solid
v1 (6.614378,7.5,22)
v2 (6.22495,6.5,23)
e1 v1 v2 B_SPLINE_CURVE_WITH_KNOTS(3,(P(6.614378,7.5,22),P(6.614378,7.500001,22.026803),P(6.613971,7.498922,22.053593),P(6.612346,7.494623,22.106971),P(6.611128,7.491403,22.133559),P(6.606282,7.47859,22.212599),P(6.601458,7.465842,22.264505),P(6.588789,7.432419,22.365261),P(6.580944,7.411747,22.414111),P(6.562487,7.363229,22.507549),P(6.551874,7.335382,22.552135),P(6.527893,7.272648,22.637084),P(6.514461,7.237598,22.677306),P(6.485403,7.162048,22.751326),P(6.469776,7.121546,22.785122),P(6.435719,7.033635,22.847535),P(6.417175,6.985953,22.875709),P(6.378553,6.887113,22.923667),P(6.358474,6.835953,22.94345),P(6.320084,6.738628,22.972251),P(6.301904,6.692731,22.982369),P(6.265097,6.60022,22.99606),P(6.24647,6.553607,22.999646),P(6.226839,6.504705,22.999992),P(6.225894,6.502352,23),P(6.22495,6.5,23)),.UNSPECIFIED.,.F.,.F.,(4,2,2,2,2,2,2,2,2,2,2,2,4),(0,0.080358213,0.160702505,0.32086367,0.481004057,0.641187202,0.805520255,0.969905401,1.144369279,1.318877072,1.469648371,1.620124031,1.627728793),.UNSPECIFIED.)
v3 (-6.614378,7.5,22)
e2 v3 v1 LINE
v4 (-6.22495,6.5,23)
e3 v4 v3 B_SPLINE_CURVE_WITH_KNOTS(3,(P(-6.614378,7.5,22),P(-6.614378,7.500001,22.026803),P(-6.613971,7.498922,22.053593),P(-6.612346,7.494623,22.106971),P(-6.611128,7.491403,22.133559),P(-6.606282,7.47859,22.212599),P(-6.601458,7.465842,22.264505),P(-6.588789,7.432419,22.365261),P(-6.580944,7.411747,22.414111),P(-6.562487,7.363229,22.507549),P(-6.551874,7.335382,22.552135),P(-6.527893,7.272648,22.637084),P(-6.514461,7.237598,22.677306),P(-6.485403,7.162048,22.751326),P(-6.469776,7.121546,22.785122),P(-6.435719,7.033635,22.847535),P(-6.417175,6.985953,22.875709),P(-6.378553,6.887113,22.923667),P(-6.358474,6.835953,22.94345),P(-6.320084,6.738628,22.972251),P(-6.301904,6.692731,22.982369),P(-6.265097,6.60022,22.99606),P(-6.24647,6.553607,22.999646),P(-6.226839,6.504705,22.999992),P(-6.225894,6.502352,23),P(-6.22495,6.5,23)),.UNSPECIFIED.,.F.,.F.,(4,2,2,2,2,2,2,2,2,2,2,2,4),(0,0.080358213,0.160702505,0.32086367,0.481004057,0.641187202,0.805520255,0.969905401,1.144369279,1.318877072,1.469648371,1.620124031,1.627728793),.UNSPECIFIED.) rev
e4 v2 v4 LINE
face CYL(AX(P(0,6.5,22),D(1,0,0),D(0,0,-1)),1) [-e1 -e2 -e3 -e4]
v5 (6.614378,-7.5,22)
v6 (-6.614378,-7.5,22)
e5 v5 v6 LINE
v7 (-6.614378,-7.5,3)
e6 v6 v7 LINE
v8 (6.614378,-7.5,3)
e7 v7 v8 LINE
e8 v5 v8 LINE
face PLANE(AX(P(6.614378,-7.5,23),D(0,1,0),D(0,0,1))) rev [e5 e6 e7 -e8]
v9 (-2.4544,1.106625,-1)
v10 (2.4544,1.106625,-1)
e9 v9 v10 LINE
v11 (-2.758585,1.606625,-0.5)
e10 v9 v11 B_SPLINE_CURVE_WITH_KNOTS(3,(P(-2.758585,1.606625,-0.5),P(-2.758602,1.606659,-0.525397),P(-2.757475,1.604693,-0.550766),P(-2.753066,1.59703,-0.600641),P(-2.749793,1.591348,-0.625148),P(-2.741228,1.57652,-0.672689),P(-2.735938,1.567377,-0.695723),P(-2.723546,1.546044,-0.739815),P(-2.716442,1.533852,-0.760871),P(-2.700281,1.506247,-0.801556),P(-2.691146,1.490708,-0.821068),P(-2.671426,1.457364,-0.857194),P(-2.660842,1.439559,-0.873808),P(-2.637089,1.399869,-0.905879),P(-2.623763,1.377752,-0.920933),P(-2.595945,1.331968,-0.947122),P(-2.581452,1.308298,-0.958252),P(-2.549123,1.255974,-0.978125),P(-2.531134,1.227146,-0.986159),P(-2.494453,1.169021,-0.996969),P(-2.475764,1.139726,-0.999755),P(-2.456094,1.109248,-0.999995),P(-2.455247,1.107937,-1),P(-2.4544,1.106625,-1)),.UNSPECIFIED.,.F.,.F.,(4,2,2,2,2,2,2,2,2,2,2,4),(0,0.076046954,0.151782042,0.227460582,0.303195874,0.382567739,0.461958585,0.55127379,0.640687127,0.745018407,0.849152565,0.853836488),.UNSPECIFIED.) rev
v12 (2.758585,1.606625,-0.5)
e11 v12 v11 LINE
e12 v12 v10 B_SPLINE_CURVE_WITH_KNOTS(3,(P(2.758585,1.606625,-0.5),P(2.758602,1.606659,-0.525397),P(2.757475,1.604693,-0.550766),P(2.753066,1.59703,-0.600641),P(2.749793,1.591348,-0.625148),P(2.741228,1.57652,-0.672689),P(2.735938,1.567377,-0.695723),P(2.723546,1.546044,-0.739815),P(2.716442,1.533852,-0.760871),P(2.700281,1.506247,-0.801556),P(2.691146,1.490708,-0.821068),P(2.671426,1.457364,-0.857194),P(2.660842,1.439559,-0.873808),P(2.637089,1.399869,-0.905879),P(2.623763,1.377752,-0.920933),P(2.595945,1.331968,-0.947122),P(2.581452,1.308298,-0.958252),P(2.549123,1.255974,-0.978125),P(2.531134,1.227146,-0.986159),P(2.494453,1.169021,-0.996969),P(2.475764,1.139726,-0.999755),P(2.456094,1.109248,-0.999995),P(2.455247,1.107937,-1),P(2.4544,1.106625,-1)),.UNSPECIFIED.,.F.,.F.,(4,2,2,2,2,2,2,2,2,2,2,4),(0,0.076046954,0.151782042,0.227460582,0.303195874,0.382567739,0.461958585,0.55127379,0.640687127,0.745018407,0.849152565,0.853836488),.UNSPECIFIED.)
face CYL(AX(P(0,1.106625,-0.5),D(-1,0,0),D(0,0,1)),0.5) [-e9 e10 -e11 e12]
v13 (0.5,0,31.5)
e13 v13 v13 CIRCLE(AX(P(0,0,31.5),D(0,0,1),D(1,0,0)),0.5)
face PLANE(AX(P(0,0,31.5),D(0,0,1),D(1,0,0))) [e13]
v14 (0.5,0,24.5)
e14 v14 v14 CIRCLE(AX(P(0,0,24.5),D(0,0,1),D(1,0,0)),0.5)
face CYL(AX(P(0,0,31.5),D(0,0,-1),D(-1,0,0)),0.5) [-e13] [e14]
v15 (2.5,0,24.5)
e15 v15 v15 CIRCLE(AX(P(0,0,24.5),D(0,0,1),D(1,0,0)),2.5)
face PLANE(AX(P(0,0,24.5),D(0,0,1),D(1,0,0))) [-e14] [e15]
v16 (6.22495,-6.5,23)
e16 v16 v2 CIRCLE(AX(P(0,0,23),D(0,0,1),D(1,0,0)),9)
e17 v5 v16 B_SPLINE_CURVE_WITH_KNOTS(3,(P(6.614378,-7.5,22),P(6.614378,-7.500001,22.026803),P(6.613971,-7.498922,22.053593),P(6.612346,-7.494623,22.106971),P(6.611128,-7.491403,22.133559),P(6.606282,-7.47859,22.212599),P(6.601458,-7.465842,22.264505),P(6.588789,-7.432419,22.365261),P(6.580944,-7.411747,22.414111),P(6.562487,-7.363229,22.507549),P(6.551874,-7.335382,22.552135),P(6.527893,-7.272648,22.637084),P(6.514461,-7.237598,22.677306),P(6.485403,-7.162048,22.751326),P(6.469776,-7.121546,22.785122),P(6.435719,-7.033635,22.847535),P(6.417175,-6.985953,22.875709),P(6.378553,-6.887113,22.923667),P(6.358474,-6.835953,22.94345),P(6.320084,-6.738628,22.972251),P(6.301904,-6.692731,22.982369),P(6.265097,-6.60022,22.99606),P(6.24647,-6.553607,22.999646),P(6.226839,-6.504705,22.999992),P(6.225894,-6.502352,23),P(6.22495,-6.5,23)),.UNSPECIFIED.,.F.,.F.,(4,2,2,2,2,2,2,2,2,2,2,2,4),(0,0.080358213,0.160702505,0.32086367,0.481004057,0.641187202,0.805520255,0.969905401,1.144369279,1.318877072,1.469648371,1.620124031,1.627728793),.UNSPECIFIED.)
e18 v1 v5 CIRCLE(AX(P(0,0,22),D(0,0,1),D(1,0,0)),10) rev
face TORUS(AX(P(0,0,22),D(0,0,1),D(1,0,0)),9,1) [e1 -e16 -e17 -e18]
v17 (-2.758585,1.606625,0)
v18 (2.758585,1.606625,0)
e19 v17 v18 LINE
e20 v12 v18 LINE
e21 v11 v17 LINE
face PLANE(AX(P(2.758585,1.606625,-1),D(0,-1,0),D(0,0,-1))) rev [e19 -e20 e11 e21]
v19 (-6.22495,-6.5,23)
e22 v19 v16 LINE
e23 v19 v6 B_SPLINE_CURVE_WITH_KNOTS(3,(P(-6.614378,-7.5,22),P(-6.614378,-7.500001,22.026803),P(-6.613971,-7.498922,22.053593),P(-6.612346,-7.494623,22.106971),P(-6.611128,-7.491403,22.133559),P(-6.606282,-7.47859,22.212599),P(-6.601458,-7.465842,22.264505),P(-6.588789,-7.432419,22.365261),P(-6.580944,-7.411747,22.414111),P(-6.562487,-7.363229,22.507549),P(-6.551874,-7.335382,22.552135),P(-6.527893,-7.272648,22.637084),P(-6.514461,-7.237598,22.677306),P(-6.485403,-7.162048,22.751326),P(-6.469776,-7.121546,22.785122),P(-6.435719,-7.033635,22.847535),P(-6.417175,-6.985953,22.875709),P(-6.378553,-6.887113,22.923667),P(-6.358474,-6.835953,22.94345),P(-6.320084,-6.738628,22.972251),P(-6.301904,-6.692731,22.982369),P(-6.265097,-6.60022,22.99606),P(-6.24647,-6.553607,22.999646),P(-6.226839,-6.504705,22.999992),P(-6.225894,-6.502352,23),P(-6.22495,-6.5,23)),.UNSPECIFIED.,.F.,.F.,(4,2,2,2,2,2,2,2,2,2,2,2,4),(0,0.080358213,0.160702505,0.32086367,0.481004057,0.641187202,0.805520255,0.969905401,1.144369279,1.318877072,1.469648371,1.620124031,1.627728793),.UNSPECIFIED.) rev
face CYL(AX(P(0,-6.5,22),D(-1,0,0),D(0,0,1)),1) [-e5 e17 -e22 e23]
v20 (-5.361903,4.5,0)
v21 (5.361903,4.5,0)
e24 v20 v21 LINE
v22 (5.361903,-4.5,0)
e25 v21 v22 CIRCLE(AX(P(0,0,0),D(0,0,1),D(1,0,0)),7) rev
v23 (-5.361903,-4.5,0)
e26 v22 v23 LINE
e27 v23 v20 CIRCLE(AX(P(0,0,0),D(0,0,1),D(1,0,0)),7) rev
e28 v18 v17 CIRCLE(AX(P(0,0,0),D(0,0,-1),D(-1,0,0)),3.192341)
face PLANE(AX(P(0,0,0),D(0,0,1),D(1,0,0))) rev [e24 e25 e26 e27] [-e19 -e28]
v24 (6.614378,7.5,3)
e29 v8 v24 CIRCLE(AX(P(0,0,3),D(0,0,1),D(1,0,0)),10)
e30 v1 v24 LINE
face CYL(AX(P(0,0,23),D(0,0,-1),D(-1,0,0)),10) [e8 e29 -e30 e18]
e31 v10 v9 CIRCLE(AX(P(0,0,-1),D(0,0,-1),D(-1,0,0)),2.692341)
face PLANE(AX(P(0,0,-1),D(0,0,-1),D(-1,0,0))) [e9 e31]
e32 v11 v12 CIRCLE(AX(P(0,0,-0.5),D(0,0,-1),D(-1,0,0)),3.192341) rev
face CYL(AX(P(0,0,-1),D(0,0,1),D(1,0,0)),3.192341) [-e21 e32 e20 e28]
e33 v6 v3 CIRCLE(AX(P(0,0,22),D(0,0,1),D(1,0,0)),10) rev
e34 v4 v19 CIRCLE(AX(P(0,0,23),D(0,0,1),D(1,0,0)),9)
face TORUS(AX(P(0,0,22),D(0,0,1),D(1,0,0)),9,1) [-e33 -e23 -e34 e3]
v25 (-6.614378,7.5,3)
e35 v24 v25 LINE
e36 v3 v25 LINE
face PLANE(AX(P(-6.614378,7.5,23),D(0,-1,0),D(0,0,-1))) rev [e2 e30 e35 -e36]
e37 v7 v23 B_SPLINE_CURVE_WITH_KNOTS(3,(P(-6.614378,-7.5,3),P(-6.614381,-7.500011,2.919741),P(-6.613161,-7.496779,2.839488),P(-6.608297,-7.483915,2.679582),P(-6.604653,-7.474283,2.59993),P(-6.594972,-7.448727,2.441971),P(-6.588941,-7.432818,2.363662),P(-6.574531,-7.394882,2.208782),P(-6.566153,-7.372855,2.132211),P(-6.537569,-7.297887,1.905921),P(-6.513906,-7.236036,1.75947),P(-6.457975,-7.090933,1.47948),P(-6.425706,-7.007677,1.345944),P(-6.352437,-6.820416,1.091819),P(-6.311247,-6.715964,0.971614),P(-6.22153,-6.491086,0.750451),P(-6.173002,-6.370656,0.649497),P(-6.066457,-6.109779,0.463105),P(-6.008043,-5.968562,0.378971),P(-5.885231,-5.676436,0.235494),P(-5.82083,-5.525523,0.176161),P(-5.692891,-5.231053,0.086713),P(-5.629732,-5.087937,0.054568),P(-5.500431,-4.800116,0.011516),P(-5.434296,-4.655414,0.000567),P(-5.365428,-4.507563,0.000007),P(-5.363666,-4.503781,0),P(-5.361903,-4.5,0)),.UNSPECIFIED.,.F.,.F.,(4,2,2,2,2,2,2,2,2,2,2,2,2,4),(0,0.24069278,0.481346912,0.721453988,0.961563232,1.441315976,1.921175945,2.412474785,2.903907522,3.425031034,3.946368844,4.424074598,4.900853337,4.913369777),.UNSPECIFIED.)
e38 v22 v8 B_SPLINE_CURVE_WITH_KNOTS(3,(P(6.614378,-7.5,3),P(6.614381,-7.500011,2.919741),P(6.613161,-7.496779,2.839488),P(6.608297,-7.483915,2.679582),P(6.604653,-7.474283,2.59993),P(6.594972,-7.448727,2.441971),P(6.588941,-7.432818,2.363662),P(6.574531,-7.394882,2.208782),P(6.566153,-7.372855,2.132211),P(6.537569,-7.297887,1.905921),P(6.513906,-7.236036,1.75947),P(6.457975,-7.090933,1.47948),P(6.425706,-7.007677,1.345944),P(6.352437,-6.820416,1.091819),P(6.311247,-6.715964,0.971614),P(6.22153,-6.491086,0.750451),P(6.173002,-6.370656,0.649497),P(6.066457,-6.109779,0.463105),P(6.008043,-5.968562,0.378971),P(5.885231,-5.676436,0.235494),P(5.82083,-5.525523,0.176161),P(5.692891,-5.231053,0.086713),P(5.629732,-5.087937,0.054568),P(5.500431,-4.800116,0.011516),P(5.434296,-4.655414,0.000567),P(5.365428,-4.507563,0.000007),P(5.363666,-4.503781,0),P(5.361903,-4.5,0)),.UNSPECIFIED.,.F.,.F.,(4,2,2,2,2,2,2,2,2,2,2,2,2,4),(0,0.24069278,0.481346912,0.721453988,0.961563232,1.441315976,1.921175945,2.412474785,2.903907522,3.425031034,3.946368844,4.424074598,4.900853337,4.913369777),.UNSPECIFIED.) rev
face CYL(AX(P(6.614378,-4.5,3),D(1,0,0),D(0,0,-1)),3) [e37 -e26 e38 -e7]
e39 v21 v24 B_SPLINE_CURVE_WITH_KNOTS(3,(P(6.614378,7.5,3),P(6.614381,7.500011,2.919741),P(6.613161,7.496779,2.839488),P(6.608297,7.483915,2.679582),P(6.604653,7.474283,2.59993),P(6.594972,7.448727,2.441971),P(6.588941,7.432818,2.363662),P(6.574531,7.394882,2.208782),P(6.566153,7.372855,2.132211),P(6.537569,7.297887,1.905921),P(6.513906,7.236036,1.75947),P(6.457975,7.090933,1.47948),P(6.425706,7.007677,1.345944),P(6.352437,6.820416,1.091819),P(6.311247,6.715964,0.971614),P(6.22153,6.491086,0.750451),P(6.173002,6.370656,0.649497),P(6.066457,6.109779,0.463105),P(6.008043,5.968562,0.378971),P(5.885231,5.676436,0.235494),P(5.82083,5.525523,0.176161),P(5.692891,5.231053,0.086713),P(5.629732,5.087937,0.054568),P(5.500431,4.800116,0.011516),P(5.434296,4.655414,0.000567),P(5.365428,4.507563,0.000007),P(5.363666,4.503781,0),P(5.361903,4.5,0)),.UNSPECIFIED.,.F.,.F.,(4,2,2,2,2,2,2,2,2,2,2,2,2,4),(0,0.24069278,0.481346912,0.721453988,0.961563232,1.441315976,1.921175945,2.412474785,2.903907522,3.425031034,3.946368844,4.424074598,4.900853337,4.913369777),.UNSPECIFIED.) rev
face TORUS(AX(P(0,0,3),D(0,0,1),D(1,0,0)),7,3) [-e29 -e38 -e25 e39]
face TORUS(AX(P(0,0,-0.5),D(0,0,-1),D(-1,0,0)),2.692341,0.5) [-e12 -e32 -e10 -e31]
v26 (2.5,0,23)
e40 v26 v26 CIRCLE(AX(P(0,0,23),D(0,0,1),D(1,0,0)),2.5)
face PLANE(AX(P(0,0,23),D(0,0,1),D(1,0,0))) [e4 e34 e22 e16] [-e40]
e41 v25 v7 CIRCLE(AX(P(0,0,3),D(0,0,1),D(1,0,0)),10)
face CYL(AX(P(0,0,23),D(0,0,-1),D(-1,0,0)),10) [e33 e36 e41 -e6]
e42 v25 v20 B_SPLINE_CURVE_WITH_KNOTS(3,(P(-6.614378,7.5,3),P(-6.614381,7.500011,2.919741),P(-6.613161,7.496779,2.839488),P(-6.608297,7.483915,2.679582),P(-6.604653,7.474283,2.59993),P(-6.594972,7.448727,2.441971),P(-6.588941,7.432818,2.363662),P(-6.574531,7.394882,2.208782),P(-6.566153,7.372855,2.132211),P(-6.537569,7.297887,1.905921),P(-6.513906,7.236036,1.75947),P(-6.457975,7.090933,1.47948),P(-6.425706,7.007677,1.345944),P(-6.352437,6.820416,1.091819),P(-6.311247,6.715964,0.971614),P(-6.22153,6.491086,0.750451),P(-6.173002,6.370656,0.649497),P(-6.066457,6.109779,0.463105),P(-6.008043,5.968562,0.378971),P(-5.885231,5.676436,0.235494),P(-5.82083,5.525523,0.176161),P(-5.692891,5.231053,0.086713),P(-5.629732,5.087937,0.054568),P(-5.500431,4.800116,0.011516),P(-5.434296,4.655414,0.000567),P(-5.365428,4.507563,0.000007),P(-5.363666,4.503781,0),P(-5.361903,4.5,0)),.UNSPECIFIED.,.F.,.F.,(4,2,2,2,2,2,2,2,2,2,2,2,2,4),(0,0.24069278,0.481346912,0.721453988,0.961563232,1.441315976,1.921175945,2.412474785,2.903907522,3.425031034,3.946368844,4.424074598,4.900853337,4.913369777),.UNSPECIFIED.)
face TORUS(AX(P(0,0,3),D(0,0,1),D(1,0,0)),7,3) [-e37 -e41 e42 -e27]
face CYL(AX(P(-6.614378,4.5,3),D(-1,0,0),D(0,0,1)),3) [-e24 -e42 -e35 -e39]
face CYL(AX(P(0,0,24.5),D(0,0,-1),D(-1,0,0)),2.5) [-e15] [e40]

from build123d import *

# Parameters (mm, degrees)
BOSS_EXTRUDE1_DEPTH = 23
SKETCH2_R           = 2.5
BOSS_EXTRUDE2_DEPTH = 1.5
SKETCH3_R           = 0.5
BOSS_EXTRUDE3_DEPTH = 7
FILLET1_R           = 1
FILLET2_R           = 3
BOSS_EXTRUDE4_DEPTH = 1
FILLET3_R           = 0.5


with BuildPart() as part:
    # Sketch1 → Boss-Extrude1 (new body)
    with BuildSketch(Plane.XY):
        with BuildLine():
            Line((-6.614378278, 7.5), (6.614378278, 7.5))
            ThreePointArc((6.614378278, 7.5), (10, 0), (6.614378278, -7.5))
            Line((6.614378278, -7.5), (-6.614378278, -7.5))
            ThreePointArc((-6.614378278, -7.5), (-10, 0), (-6.614378278, 7.5))
        make_face()
    extrude(amount=BOSS_EXTRUDE1_DEPTH)

    # Sketch2 → Boss-Extrude2 (add)
    with BuildSketch(Plane.XY.offset(23)):
        Circle(SKETCH2_R)
    extrude(amount=BOSS_EXTRUDE2_DEPTH)

    # Sketch3 → Boss-Extrude3 (add)
    with BuildSketch(Plane.XY.offset(24.5)):
        Circle(SKETCH3_R)
    extrude(amount=BOSS_EXTRUDE3_DEPTH)

    # Fillet1
    fillet1_edges = [part.edges().sort_by_distance(p)[0] for p in [
        (10, 0, 23),
        (0, 7.5, 23),
        (-10, 0, 23),
        (0, -7.5, 23),
    ]]
    fillet(fillet1_edges, radius=FILLET1_R)

    # Fillet2
    # the kernel refuses this fillet: 3 mm, written as the material it takes off along each edge
    with BuildSketch(Plane(origin=(-14.114378278, 7.5, 0), x_dir=(0, 0, 1), z_dir=(1, 0, 0))) as fillet2_piece_1:
        with BuildLine():
            CenterArc((FILLET2_R, FILLET2_R), FILLET2_R, 180, 90)
            Line((0, FILLET2_R), (0, 0))
            Line((0, 0), (FILLET2_R, 0))
        make_face()
    extrude(amount=28.228756555, mode=Mode.SUBTRACT)
    with BuildSketch(Plane(origin=(0, 0, 0), x_dir=(-0.027613533277189895, 0.9996186736850955, 0), z_dir=(-0.9996186736850955, -0.027613533277189895, 0))) as fillet2_piece_2:
        with BuildLine():
            CenterArc((10 - FILLET2_R, -FILLET2_R), FILLET2_R, 0, 90)
            Line((10, -FILLET2_R), (10, 0))
            Line((10, 0), (10 - FILLET2_R, 0))
        make_face()
    revolve(axis=Axis((0, 0, 0), (0, 0, -1)), revolution_arc=183.164680097, mode=Mode.SUBTRACT)
    with BuildSketch(Plane(origin=(14.114378278, -7.5, 0), x_dir=(0, 1, 0), z_dir=(-1, 0, 0))) as fillet2_piece_3:
        with BuildLine():
            CenterArc((FILLET2_R, -FILLET2_R), FILLET2_R, 90, 90)
            Line((0, -FILLET2_R), (0, 0))
            Line((0, 0), (FILLET2_R, 0))
        make_face()
    extrude(amount=28.228756555, mode=Mode.SUBTRACT)
    with BuildSketch(Plane(origin=(0, 0, 0), x_dir=(0.02761353327718998, -0.9996186736850955, 0), z_dir=(0.9996186736850955, 0.02761353327718998, 0))) as fillet2_piece_4:
        with BuildLine():
            CenterArc((10 - FILLET2_R, -FILLET2_R), FILLET2_R, 0, 90)
            Line((10 - FILLET2_R, 0), (10, 0))
            Line((10, 0), (10, -FILLET2_R))
        make_face()
    revolve(axis=Axis((0, 0, 0), (0, 0, -1)), revolution_arc=183.164680097, mode=Mode.SUBTRACT)

    # Sketch4 → Boss-Extrude4 (add)
    with BuildSketch(Plane(origin=(0, 0, 0), x_dir=(-1, 0, 0), z_dir=(0, 0, -1))):
        with BuildLine():
            Line((-2.758585466, 1.606625472), (2.758585466, 1.606625472))
            ThreePointArc((2.758585466, 1.606625472), (0, -3.192340705), (-2.758585466, 1.606625472))
        make_face()
    extrude(amount=BOSS_EXTRUDE4_DEPTH)

    # Fillet3
    fillet3_edges = [part.edges().sort_by_distance(p)[0] for p in [
        (0, -3.192340705, -1),
        (0, 1.606625472, -1),
    ]]
    fillet(fillet3_edges, radius=FILLET3_R)


solid = part.part
